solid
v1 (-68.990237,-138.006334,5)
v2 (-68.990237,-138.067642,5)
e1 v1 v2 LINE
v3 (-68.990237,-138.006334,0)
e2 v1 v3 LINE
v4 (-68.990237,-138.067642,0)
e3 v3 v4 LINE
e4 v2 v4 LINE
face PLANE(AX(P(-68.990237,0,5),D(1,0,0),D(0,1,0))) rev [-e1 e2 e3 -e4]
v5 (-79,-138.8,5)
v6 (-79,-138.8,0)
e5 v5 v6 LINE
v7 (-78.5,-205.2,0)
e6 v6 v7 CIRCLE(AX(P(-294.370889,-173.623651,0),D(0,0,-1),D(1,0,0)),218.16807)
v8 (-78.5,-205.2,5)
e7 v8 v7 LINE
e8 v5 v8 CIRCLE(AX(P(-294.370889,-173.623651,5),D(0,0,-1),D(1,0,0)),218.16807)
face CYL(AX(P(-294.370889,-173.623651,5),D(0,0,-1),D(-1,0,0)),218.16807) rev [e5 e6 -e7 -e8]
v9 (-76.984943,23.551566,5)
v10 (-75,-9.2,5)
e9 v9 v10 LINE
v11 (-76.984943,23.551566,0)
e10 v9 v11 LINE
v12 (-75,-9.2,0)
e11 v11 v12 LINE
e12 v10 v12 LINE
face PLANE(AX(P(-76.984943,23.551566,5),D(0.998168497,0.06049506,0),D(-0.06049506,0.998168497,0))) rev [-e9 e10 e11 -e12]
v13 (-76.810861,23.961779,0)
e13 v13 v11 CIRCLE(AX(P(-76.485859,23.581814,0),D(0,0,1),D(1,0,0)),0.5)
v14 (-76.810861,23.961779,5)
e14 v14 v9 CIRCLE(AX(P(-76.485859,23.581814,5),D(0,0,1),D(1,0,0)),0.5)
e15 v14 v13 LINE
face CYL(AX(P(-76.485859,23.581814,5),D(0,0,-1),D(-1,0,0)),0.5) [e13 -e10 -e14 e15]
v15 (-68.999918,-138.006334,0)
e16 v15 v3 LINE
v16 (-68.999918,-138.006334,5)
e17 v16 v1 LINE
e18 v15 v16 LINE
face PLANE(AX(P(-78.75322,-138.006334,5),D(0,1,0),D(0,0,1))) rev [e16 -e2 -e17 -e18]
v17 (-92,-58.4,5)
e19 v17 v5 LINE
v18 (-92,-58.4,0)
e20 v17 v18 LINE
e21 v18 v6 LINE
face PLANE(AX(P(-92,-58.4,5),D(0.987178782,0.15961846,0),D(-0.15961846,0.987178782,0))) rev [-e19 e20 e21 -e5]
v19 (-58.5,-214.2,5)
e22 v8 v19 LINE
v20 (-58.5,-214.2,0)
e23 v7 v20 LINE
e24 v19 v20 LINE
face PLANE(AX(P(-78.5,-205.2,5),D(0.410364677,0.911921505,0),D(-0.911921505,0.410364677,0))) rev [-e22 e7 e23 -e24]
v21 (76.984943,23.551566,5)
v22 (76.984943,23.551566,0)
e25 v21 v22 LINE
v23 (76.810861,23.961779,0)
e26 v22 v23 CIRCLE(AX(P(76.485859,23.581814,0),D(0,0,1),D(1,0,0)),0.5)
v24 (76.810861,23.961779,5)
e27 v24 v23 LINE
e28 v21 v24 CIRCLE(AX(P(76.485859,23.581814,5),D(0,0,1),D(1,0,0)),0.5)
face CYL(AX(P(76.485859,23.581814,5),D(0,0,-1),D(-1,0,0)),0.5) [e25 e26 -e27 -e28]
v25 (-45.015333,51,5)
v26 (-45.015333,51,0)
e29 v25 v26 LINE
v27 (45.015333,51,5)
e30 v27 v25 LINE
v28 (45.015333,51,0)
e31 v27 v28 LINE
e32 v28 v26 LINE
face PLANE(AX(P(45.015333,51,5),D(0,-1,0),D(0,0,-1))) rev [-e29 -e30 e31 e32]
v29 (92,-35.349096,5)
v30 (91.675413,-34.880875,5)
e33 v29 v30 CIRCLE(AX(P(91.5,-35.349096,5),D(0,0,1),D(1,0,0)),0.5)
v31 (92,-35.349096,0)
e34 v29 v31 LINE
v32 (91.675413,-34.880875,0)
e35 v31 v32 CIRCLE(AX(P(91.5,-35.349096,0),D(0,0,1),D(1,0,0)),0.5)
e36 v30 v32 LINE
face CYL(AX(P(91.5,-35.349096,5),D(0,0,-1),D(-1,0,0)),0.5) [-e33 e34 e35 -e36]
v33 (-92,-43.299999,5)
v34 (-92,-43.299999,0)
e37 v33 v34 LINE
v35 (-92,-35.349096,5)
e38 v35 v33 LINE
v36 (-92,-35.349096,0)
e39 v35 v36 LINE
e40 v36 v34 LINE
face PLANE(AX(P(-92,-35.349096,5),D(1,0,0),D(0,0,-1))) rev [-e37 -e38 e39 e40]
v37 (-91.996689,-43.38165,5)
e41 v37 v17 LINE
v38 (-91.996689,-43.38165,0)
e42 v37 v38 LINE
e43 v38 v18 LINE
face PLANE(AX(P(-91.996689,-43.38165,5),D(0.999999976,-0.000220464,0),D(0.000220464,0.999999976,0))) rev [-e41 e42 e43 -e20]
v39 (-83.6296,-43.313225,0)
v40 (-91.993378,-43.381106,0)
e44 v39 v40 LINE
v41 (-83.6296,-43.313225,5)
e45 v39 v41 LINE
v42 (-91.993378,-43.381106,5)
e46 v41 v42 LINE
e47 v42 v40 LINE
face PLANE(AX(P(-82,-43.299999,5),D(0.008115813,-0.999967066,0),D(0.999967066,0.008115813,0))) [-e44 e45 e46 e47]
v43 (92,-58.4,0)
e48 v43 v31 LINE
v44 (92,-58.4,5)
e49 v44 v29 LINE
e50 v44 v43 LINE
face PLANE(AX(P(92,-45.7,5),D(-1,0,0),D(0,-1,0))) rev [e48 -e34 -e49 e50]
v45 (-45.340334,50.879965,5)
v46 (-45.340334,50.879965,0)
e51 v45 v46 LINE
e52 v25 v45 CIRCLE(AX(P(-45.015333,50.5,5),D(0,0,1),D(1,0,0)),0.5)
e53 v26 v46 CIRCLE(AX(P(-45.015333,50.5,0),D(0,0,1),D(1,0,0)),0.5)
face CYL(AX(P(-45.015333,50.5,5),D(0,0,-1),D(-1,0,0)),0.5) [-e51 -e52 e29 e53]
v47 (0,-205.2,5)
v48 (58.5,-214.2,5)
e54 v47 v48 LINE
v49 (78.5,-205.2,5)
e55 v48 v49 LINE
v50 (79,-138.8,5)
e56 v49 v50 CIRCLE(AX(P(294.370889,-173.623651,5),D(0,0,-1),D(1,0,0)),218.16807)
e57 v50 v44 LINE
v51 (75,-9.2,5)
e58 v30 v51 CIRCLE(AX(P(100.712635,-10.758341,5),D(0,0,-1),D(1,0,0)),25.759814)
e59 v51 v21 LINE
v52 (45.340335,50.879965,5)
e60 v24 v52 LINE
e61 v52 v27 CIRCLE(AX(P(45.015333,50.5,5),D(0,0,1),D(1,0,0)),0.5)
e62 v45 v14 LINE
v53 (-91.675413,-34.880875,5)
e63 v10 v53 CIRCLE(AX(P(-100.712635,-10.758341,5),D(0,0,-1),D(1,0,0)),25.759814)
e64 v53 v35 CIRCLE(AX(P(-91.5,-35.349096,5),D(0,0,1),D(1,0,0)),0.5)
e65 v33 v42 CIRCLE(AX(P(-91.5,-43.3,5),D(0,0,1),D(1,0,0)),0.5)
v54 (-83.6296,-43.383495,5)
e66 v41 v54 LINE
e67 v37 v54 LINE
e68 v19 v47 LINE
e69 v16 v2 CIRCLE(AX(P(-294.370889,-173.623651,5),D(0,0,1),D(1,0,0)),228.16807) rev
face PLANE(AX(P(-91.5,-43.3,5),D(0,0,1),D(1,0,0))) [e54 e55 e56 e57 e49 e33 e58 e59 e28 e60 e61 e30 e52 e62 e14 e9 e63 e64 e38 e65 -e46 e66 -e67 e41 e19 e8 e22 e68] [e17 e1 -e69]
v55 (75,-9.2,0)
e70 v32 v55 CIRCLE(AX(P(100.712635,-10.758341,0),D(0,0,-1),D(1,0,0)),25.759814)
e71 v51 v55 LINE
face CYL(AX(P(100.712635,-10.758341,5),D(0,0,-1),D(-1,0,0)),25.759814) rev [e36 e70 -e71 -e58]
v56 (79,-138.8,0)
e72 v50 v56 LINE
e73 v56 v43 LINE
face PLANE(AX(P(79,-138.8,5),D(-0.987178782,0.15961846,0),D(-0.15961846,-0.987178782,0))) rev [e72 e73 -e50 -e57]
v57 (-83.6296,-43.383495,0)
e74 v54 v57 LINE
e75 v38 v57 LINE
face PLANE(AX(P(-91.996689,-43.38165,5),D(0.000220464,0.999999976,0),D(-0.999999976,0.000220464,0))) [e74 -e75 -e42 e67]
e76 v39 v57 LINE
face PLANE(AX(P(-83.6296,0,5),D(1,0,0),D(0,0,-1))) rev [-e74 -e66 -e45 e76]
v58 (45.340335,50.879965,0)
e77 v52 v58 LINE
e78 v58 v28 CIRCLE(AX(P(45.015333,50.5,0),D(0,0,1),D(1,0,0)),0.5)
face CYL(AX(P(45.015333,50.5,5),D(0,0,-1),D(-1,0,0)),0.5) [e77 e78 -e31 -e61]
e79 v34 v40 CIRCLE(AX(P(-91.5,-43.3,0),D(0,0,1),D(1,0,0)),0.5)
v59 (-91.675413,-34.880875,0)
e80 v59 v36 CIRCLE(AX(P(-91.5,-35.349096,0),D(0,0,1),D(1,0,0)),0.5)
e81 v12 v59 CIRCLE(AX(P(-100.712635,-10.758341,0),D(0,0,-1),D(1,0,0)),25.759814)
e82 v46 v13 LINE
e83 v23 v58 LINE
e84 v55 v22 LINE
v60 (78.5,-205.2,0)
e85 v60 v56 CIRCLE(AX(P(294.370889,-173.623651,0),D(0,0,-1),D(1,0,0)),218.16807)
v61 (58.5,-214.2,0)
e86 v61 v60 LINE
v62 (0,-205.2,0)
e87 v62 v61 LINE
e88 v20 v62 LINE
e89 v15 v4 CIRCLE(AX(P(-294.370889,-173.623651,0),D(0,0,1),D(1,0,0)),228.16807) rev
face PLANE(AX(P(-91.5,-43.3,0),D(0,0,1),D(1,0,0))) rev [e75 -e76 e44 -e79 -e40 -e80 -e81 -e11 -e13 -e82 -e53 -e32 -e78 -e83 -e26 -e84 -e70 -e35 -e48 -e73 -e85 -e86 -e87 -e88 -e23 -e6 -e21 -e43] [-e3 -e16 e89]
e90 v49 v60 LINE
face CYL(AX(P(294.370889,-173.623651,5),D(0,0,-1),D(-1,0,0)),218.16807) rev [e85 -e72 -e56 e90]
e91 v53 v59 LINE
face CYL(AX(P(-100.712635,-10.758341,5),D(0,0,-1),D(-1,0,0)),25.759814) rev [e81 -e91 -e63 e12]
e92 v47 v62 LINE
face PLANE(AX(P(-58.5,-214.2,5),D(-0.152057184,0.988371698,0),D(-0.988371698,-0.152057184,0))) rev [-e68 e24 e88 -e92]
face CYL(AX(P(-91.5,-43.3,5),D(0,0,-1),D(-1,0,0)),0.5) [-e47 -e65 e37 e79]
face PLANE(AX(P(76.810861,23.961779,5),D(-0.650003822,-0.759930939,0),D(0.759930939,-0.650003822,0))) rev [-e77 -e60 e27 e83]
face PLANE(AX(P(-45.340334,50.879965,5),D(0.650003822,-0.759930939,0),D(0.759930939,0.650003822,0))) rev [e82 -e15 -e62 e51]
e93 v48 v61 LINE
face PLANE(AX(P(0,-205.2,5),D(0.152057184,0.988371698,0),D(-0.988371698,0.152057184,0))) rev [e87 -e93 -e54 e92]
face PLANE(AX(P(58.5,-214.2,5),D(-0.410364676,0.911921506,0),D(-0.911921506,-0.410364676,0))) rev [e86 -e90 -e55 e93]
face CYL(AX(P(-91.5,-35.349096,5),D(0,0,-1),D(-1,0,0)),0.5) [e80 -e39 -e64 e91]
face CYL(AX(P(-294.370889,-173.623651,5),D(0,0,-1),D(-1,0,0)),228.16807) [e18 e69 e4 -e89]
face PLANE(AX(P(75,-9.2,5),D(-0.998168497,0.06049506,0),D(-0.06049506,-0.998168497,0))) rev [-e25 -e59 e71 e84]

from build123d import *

# Parameters (mm, degrees)
EXTRUDE_1_DEPTH   = 5
EXTRUDE_1_2_DEPTH = 5


# Read off the part's stored shape, not the designer's step: 拉伸-薄壁1
with BuildPart() as part:
    # Extrude 1 outline → Extrude 1 (new body)
    with BuildSketch(Plane.XY):
        with BuildLine():
            ThreePointArc((-91.999999998, -43.29999887), (-91.998341789, -43.340687344), (-91.993377975, -43.381105931))
            Line((-91.993377975, -43.381105931), (-81.999999998, -43.29999887))
            Line((-81.999999998, -43.29999887), (-81.999999998, -41.231306411))
            ThreePointArc((-81.999999998, -41.231306411), (-68.990237418, -27.264516088), (-65.018315032, -8.595049387))
            Line((-65.018315032, -8.595049387), (-66.717183167, 19.436274835))
            Line((-66.717183167, 19.436274835), (-41.506651541, 41))
            Line((-41.506651541, 41), (41.506651544, 41))
            Line((41.506651544, 41), (66.717183171, 19.436274835))
            Line((66.717183171, 19.436274835), (65.018315035, -8.595049396))
            ThreePointArc((65.018315035, -8.595049396), (68.990237423, -27.264516092), (82.000000002, -41.231306411))
            Line((82.000000002, -41.231306411), (82.000000002, -57.596758434))
            Line((82.000000002, -57.596758434), (69.128212183, -137.203815401))
            ThreePointArc((69.128212183, -137.203815401), (66.269370107, -168.113208397), (67.632339208, -199.124591285))
            Line((67.632339208, -199.124591285), (57.095329321, -203.866245712))
            Line((57.095329321, -203.866245712), (2e-09, -195.082348893))
            Line((2e-09, -195.082348893), (-57.095329308, -203.86624571))
            Line((-57.095329308, -203.86624571), (-67.632339202, -199.124591258))
            ThreePointArc((-67.632339202, -199.124591258), (-66.269370105, -168.113208363), (-69.128212188, -137.20381536))
            Line((-69.128212188, -137.20381536), (-81.999822911, -57.597853653))
            Line((-81.999822911, -57.597853653), (-81.996689231, -43.383854869))
            Line((-81.996689231, -43.383854869), (-91.996688988, -43.381650225))
            Line((-91.996688988, -43.381650225), (-91.999999999, -58.4))
            Line((-91.999999999, -58.4), (-79.000000006, -138.79999996))
            ThreePointArc((-79.000000006, -138.79999996), (-76.209004677, -171.980865978), (-78.499999999, -205.199999999))
            Line((-78.499999999, -205.199999999), (-58.499999998, -214.2))
            Line((-58.499999998, -214.2), (2e-09, -205.199999999))
            Line((2e-09, -205.199999999), (58.500000002, -214.2))
            Line((58.500000002, -214.2), (78.500000007, -205.200000039))
            ThreePointArc((78.500000007, -205.200000039), (76.209004679, -171.980866018), (79.000000002, -138.799999999))
            Line((79.000000002, -138.799999999), (92.000000002, -58.4))
            Line((92.000000002, -58.4), (92.000000002, -35.349095722))
            ThreePointArc((92.000000002, -35.349095722), (91.910917667, -35.064233027), (91.675413177, -34.880875309))
            ThreePointArc((91.675413177, -34.880875309), (79.107890632, -24.786992353), (75.000000002, -9.2))
            Line((75.000000002, -9.2), (76.984943405, 23.551566159))
            ThreePointArc((76.984943405, 23.551566159), (76.946128848, 23.777138637), (76.810861071, 23.961779211))
            Line((76.810861071, 23.961779211), (45.340334501, 50.87996546))
            ThreePointArc((45.340334501, 50.87996546), (45.188562585, 50.969032371), (45.015332579, 51))
            Line((45.015332579, 51), (-45.015332561, 51))
            ThreePointArc((-45.015332561, 51), (-45.188562568, 50.969032376), (-45.340334486, 50.879965469))
            Line((-45.340334486, 50.879965469), (-76.810861028, 23.961779245))
            ThreePointArc((-76.810861028, 23.961779245), (-76.946128824, 23.777138686), (-76.984943405, 23.551566212))
            Line((-76.984943405, 23.551566212), (-74.999999999, -9.199999994))
            ThreePointArc((-74.999999999, -9.199999994), (-79.107890627, -24.786992351), (-91.675413174, -34.880875309))
            ThreePointArc((-91.675413174, -34.880875309), (-91.910917622, -35.064232967), (-91.999999998, -35.349095576))
            Line((-91.999999998, -35.349095576), (-91.999999998, -43.29999887))
        make_face()
    extrude(amount=EXTRUDE_1_DEPTH)

    # 草图7 → Extrude 1 2 (add)
    with BuildSketch(Plane.XY):
        with BuildLine():
            Line((-81.999999998, -43.29999887), (-83.629600195, -43.313224837))
            Line((-83.629600195, -43.313224837), (-83.629600195, -43.38349487))
            Line((-83.629600195, -43.38349487), (-81.996689231, -43.383854869))
            Line((-81.996689231, -43.383854869), (-81.999822911, -57.597853653))
            Line((-81.999822911, -57.597853653), (-69.128212188, -137.20381536))
            ThreePointArc((-69.128212188, -137.20381536), (-69.063707743, -137.605017492), (-68.999917919, -138.006333867))
            Line((-68.999917919, -138.006333867), (-68.990237418, -138.006333867))
            Line((-68.990237418, -138.006333867), (-68.990237418, -138.06764197))
            ThreePointArc((-68.990237418, -138.06764197), (-66.259225934, -168.550479027), (-67.632339202, -199.124591258))
            Line((-67.632339202, -199.124591258), (-57.095329308, -203.86624571))
            Line((-57.095329308, -203.86624571), (2e-09, -195.082348893))
            Line((2e-09, -195.082348893), (57.095329321, -203.866245712))
            Line((57.095329321, -203.866245712), (67.632339208, -199.124591285))
            ThreePointArc((67.632339208, -199.124591285), (66.269370107, -168.113208397), (69.128212183, -137.203815401))
            Line((69.128212183, -137.203815401), (82.000000002, -57.596758434))
            Line((82.000000002, -57.596758434), (82.000000002, -41.231306411))
            ThreePointArc((82.000000002, -41.231306411), (68.990237423, -27.264516092), (65.018315035, -8.595049396))
            Line((65.018315035, -8.595049396), (66.717183171, 19.436274835))
            Line((66.717183171, 19.436274835), (41.506651544, 41))
            Line((41.506651544, 41), (-41.506651541, 41))
            Line((-41.506651541, 41), (-66.717183167, 19.436274835))
            Line((-66.717183167, 19.436274835), (-65.018315032, -8.595049387))
            ThreePointArc((-65.018315032, -8.595049387), (-68.990237418, -27.264516088), (-81.999999998, -41.231306411))
            Line((-81.999999998, -41.231306411), (-81.999999998, -43.29999887))
        make_face()
    extrude(amount=EXTRUDE_1_2_DEPTH)


solid = part.part
